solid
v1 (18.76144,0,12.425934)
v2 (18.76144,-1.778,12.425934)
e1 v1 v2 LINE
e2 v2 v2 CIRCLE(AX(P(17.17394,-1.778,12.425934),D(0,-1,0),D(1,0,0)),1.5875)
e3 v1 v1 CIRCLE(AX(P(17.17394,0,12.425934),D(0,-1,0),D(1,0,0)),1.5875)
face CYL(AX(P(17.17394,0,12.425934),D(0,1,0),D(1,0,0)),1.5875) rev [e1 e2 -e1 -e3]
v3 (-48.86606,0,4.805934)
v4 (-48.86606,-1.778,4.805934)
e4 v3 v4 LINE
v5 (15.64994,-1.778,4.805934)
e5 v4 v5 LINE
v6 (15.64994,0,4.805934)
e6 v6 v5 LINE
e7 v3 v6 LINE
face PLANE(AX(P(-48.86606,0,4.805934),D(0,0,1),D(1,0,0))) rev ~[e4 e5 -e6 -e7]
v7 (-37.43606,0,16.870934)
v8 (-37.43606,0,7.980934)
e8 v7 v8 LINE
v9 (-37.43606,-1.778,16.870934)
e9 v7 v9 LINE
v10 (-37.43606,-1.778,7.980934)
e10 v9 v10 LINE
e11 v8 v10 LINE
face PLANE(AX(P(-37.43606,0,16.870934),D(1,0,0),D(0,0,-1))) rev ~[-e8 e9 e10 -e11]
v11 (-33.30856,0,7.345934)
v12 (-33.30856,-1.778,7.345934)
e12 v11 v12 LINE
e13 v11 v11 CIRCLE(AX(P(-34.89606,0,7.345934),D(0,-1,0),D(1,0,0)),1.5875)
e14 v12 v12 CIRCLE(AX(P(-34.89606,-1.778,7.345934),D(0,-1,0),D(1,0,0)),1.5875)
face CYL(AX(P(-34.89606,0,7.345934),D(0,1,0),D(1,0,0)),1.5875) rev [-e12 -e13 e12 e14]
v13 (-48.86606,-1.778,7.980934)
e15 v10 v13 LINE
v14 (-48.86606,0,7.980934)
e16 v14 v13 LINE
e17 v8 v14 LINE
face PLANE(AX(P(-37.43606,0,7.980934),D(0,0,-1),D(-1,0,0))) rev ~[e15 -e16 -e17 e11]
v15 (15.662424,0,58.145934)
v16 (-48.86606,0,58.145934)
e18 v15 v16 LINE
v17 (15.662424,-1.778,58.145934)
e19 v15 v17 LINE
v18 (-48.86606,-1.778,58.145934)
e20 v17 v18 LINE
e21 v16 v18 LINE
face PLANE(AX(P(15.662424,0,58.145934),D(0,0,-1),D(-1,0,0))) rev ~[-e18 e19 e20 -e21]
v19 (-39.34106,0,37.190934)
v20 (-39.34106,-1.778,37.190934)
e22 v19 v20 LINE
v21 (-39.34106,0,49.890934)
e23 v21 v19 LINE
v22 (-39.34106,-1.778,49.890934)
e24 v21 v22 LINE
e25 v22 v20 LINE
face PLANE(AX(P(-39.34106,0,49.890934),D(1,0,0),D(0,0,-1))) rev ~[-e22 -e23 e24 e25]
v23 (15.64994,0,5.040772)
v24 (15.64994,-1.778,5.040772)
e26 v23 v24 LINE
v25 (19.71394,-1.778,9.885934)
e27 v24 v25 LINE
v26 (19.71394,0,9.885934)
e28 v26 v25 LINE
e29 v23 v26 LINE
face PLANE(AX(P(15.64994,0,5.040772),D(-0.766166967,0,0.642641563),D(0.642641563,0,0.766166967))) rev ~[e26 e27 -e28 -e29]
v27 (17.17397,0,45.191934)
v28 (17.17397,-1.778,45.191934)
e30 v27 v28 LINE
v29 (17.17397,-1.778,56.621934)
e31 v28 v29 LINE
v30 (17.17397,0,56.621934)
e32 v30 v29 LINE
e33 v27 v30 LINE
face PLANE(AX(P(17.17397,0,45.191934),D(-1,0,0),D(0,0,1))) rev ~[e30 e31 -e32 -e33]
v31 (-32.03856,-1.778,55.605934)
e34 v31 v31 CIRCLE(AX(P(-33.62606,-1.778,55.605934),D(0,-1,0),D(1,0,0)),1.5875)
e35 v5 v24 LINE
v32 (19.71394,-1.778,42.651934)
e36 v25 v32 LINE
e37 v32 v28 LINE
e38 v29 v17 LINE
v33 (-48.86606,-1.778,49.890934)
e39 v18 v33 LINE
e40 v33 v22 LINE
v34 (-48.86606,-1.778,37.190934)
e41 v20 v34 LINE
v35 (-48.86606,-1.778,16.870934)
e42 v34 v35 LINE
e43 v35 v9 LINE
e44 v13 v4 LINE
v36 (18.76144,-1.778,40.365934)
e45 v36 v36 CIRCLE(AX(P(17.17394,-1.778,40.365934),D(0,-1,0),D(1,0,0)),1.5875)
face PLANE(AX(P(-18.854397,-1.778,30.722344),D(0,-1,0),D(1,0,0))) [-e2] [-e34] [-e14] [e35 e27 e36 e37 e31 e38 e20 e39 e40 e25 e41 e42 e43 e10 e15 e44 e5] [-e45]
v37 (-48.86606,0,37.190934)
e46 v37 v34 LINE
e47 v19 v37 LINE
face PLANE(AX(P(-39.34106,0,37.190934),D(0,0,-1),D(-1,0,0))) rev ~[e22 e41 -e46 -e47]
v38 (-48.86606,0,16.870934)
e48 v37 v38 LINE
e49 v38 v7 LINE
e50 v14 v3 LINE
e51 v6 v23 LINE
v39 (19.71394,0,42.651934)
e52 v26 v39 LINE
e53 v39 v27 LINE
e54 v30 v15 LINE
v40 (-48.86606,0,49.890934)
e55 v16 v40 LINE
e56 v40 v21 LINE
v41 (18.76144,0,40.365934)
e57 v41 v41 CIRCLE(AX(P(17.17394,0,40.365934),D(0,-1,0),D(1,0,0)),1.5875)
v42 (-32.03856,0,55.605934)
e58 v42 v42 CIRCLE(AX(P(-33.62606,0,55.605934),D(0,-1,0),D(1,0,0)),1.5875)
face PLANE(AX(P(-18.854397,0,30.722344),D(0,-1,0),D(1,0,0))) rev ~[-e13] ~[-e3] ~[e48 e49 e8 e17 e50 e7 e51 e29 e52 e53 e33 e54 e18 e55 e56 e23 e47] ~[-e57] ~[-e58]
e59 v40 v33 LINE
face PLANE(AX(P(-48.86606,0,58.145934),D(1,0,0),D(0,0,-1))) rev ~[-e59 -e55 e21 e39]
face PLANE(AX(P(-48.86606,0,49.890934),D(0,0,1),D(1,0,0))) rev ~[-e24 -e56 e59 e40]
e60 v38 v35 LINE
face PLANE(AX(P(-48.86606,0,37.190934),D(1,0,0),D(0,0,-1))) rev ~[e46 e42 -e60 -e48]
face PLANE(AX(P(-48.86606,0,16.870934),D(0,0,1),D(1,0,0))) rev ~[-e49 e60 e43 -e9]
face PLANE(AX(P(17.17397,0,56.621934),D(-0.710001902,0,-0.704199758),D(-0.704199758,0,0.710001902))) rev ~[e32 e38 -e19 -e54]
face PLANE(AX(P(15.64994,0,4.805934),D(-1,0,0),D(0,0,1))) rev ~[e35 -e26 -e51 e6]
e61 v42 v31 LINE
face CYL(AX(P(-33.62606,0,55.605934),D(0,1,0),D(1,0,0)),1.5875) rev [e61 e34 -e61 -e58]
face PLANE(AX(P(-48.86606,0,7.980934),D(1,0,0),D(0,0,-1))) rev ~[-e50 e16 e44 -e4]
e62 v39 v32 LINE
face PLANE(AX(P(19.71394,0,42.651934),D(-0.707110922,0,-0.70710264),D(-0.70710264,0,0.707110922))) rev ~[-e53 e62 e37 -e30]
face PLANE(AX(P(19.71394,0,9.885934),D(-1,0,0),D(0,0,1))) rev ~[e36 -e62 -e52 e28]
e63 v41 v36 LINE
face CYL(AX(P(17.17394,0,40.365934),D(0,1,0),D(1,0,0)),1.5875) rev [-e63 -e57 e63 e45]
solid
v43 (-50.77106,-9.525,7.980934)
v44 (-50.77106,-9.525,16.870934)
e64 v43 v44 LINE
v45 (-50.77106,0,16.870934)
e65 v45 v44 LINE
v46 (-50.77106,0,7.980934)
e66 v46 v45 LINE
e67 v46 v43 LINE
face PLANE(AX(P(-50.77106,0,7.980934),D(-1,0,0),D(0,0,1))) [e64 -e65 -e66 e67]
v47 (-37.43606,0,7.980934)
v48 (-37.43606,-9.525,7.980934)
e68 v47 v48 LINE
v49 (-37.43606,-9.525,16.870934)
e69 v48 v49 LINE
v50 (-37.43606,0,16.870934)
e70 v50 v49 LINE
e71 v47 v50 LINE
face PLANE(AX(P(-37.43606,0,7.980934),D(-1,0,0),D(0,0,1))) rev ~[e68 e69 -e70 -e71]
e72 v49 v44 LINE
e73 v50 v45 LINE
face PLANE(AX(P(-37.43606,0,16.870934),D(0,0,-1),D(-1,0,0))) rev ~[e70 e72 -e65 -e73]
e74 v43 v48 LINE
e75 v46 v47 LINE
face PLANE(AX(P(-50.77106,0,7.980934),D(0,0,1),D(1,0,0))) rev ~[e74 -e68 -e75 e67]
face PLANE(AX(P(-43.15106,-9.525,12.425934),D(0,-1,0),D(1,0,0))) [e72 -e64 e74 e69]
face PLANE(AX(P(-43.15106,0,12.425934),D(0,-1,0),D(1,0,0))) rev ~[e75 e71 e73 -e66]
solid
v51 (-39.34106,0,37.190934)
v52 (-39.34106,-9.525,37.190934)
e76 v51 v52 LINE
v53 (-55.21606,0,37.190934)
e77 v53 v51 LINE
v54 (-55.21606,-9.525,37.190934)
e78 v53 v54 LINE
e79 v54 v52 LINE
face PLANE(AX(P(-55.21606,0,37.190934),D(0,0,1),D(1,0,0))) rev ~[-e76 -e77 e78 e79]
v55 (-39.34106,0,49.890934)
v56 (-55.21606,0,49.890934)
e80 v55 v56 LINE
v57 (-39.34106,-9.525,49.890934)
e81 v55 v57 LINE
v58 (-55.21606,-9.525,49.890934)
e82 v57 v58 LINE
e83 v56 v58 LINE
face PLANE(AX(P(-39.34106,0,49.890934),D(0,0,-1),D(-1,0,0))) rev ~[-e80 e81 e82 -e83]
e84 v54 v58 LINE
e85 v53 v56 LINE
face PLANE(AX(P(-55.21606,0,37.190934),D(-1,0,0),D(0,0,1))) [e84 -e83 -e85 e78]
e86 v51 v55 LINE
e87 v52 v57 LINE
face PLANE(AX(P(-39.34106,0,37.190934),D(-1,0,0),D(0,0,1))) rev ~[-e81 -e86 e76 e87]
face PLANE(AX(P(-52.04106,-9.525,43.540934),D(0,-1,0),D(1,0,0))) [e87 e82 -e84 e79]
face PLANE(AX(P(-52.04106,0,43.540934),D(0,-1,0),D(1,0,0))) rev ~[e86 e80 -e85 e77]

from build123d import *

# Parameters (mm, degrees)
F0_R     = 1.5875
F1_DEPTH = 1.778
F0_W     = 6.35
F0_H     = 12.7
F0_W_2   = 9.525
F2_DEPTH = 9.525
F0_W_3   = 11.43
F0_H_2   = 8.89
F0_W_4   = 1.905


# Not quite as in the source:
# - ends of sketch curves that miss each other by under 0.0002 mm in the source are joined


with BuildPart() as f1:
    # F0 (on Front) → F1 (new body)
    with BuildSketch(Plane.XZ):
        Polygon((15.6624242663, 58.1459343719), (-48.8660596311, 58.1459343719), (-48.8660596311, 49.8909343719), (-39.3410596311, 49.8909343719), (-39.3410596311, 37.1909343719), (-48.8660596311, 37.1909343719), (-48.8660596311, 16.8709343719), (-37.4360596311, 16.8709343719), (-37.4360596311, 7.9809343719), (-48.8660596311, 7.9809343719), (-48.8660596311, 4.8059343719), (15.6499403689, 4.8059343719), (15.6499403689, 5.0407722592), (19.7139403689, 9.8859343719), (19.7139403689, 42.6519343719), (17.1739701182, 45.1919343719), (17.1739701182, 56.6219343719), align=None)
        with Locations((-34.8960596311, 7.3459343719)):
            Circle(F0_R, mode=Mode.SUBTRACT)
        with Locations((17.1739403689, 12.4259343719)):
            Circle(F0_R, mode=Mode.SUBTRACT)
        with Locations((-33.6260596311, 55.6059343719)):
            Circle(F0_R, mode=Mode.SUBTRACT)
        with Locations((17.1739403689, 40.3659343719)):
            Circle(F0_R, mode=Mode.SUBTRACT)
    extrude(amount=F1_DEPTH)


with BuildPart() as f2:
    # F0 (on Front) → F2 (new body)
    with BuildSketch(Plane.XZ):
        with Locations((-52.0410596311, 43.5409343719)):
            Rectangle(F0_W, F0_H)
        with Locations((-44.1035596311, 43.5409343719)):
            Rectangle(F0_W_2, F0_H)
    extrude(amount=F2_DEPTH)


with BuildPart() as f2b:
    # F0 (on Front) → F2, piece 2 (new body)
    with BuildSketch(Plane.XZ):
        with Locations((-43.1510596311, 12.4259343719)):
            Rectangle(F0_W_3, F0_H_2)
        with Locations((-49.8185596311, 12.4259343719)):
            Rectangle(F0_W_4, F0_H_2)
    extrude(amount=F2_DEPTH)


solid = Compound([f1.part, f2.part, f2b.part])
